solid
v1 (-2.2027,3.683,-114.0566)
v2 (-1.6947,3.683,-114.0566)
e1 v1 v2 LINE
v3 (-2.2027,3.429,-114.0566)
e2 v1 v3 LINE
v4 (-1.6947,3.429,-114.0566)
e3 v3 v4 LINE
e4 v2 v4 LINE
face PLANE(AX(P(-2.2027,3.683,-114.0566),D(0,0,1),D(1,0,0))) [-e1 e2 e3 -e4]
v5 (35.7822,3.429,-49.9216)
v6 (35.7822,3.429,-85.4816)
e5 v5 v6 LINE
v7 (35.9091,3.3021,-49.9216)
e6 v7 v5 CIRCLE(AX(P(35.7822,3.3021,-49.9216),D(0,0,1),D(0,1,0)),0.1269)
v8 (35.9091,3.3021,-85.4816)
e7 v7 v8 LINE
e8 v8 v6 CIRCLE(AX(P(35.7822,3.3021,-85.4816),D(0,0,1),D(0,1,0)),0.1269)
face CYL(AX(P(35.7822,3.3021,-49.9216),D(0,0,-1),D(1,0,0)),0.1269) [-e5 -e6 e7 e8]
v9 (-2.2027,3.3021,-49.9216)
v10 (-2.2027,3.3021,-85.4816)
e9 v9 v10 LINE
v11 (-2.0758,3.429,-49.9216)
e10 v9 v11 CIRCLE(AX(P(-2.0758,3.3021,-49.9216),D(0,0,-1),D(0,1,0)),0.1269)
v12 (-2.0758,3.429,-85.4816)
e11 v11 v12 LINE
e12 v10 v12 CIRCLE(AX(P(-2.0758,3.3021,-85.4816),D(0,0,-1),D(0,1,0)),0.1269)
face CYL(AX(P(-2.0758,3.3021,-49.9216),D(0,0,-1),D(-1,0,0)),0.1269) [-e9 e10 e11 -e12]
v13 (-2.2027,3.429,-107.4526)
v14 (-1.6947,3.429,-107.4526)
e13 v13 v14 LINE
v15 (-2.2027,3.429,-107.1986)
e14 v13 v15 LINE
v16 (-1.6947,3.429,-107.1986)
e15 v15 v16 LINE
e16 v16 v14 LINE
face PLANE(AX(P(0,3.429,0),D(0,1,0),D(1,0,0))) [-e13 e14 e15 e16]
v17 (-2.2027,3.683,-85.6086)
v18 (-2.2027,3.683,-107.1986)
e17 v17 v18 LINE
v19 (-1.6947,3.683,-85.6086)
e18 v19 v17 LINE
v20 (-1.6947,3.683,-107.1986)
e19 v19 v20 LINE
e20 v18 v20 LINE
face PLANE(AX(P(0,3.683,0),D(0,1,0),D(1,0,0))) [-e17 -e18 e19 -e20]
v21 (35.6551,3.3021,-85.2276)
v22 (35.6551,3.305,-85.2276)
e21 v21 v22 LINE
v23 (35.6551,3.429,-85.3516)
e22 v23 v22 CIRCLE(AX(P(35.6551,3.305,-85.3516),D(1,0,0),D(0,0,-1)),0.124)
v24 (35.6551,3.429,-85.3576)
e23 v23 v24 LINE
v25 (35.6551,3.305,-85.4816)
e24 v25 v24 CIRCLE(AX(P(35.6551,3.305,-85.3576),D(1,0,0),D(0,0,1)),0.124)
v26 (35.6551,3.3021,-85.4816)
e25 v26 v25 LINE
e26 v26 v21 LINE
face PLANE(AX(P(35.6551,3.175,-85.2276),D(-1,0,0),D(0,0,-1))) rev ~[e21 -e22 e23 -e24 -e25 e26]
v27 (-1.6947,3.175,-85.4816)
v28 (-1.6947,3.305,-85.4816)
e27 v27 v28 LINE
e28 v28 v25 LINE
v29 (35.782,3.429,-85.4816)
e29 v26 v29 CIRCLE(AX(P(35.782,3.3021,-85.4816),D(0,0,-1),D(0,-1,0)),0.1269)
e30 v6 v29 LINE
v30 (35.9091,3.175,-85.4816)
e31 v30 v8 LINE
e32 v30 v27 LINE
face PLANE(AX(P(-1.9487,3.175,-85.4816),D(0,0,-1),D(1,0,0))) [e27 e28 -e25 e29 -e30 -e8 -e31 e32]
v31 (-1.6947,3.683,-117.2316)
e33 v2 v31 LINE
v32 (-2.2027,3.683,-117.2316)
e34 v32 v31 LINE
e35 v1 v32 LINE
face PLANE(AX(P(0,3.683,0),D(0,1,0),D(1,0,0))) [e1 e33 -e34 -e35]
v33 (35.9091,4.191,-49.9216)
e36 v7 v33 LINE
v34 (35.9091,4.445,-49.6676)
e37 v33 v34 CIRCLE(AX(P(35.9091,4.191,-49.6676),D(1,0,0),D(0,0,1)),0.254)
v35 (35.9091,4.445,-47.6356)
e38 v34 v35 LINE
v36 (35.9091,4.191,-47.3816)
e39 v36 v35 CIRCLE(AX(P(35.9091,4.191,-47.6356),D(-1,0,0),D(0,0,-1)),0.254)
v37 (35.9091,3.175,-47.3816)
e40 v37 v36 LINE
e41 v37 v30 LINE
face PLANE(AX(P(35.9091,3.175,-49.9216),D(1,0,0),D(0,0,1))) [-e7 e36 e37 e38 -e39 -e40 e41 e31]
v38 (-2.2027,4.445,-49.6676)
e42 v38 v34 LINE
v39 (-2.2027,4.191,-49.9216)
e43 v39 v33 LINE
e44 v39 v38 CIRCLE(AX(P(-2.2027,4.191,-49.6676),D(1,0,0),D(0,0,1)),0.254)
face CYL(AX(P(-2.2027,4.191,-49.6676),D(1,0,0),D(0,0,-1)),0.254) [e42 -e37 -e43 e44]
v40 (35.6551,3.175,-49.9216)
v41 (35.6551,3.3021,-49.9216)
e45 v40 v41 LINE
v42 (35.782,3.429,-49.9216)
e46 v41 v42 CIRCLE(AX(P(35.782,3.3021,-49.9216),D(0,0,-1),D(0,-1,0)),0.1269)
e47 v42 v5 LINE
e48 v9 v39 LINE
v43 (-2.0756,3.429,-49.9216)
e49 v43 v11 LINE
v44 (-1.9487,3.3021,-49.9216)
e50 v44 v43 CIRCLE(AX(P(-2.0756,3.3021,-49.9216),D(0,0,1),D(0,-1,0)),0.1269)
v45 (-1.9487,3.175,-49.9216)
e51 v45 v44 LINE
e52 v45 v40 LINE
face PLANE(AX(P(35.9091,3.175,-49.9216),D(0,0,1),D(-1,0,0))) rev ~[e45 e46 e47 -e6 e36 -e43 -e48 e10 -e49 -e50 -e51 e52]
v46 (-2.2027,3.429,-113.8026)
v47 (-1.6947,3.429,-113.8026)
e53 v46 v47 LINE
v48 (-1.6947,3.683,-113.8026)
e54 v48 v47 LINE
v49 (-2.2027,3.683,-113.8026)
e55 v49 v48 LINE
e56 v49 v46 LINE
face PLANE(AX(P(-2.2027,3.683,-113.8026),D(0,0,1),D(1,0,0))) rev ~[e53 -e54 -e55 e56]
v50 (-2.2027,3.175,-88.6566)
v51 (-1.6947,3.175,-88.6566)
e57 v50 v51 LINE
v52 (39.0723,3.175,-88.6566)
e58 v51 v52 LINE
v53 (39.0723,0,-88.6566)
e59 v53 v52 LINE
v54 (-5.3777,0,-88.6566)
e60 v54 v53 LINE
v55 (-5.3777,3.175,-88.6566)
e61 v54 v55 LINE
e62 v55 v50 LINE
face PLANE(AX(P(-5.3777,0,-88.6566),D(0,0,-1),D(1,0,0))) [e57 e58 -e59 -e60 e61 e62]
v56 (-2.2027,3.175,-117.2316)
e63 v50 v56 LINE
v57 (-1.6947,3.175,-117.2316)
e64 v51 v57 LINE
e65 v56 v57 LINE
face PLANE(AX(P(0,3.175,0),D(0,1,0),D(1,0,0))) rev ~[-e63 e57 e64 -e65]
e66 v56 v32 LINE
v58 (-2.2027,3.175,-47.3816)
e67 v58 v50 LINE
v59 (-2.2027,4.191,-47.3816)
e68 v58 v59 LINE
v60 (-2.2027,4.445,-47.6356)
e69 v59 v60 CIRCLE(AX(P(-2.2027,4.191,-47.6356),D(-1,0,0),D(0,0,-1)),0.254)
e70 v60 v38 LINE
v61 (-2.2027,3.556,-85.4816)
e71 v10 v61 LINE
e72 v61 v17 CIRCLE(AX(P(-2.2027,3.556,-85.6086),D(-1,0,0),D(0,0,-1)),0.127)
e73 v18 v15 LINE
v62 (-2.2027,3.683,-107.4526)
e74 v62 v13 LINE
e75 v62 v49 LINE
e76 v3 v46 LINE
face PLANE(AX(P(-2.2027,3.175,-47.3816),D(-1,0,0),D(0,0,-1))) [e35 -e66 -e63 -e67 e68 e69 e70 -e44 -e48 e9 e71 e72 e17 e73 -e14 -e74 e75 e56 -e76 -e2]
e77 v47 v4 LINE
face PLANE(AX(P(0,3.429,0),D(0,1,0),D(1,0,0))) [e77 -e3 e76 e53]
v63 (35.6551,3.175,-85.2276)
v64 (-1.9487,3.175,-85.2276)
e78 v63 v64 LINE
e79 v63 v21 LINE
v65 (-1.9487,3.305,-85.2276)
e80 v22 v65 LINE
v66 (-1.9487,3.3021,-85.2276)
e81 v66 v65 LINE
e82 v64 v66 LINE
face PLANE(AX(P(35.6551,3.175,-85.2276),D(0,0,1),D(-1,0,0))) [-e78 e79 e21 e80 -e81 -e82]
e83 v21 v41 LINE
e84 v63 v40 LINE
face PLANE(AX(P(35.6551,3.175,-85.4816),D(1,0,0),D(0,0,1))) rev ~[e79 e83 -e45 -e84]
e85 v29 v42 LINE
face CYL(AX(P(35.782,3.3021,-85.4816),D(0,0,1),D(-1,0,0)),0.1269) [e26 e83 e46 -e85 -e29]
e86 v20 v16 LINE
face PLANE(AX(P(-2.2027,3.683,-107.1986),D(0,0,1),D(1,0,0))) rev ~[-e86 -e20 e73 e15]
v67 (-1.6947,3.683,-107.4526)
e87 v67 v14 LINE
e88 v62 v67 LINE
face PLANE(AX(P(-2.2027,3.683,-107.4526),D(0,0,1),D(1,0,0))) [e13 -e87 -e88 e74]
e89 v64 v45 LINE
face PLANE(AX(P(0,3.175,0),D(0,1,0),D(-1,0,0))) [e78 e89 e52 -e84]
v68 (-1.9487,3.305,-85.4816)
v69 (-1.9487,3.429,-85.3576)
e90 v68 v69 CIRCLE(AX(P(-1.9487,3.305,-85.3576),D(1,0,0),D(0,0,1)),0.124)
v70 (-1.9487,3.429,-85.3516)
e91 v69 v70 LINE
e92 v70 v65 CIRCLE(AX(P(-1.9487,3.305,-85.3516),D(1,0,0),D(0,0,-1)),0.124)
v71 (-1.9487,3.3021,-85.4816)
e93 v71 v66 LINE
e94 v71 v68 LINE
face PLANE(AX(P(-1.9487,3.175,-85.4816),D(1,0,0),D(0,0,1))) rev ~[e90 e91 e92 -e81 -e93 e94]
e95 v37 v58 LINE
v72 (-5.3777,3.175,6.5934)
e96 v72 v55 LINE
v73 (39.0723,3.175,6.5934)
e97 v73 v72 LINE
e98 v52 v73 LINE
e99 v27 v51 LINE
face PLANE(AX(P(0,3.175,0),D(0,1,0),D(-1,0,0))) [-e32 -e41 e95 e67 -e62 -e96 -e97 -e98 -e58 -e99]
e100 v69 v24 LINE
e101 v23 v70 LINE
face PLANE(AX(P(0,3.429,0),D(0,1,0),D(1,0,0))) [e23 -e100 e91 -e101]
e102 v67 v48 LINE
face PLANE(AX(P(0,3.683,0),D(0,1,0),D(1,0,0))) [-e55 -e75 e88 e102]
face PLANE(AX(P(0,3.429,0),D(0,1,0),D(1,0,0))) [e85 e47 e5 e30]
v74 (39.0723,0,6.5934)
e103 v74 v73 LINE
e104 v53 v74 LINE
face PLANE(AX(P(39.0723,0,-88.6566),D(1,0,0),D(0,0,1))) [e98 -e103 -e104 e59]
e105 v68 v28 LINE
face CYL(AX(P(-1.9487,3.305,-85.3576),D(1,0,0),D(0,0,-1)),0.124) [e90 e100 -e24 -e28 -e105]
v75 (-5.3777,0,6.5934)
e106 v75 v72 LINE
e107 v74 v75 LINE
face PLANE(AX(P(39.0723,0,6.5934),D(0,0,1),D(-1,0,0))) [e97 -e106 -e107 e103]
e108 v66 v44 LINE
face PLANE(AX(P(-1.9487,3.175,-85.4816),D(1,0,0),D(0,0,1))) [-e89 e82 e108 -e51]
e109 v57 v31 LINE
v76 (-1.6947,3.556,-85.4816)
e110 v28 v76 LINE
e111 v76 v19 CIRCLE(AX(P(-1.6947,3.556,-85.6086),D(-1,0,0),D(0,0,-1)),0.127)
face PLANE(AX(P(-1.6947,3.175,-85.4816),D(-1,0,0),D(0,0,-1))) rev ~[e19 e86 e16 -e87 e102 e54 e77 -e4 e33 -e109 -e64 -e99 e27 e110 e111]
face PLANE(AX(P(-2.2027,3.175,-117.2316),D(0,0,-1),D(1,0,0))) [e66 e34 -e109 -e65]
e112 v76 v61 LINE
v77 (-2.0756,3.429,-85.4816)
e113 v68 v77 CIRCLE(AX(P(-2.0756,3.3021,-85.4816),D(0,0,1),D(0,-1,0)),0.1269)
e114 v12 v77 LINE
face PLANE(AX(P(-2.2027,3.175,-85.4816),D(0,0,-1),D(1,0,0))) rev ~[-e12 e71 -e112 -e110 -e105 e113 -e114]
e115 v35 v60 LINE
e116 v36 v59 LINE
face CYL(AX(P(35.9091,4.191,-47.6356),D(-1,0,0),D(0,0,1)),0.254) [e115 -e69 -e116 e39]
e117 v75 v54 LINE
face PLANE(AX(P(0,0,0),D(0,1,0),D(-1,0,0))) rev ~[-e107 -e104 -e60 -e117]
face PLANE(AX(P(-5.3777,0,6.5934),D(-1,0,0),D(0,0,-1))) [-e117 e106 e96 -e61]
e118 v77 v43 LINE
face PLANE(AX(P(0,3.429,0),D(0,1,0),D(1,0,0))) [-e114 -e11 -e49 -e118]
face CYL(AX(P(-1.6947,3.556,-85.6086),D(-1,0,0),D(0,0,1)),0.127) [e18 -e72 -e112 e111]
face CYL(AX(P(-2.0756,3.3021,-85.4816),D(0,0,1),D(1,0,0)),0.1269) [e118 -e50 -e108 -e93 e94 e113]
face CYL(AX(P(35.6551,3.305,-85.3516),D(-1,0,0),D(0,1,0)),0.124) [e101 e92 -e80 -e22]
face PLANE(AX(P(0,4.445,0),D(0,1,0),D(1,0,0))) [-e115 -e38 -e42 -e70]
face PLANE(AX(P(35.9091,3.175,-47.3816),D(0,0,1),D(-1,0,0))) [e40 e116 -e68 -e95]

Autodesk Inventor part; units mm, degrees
ref_plane "YZ Plane" through (0, 0, 0) normal (1, 0, 0) x (0, 1, 0)
ref_plane "XZ Plane" through (0, 0, 0) normal (0, 1, 0) x (-1, 0, 0)
ref_plane "XY Plane" through (0, 0, 0) normal (0, 0, 1) x (1, 0, 0)
sketch "Sketch1" plane through (0, 0, 0) normal (0, 1, 0) x (-1, 0, 0)
  line L0 (5.3777, 6.5934) -> (5.3777, -88.6566)
  line L1 (5.3777, -88.6566) -> (-39.0723, -88.6566)
  line L2 (-39.0723, -88.6566) -> (-39.0723, 6.5934)
  line L3 (-39.0723, 6.5934) -> (5.3777, 6.5934)
  point P0 (0, 0)
  dimension "d0" = 95.25
  dimension "d1" = 44.45
extrude "Extrusion1" add sketch "Sketch1" along normal blind 3.175
sketch "Sketch2" plane through (0, 3.175, 0) normal (0, 1, 0) x (1, 0, 0)
  line L0 (39.0723, 88.6566) -> (-5.3777, 88.6566) projected
  line L1 (-5.3777, 88.6566) -> (-2.2027, 88.6566)
  line L2 (-2.2027, 88.6566) -> (-2.2027, 85.4816)
  line L3 (-2.2027, 85.4816) -> (-1.9487, 85.4816)
  line L4 (-1.9487, 85.4816) -> (-1.9487, 49.9216)
  line L5 (-1.9487, 49.9216) -> (-2.2027, 49.9216)
  line L6 (-2.2027, 49.9216) -> (-2.2027, 85.4816)
  point P0 (0, 0)
  dimension "d4" = 3.175
  dimension "d5" = 3.175
  dimension "d6" = 0.254
  dimension "d7" = 35.56
  dimension "d8" = 35.56
extrude "Extrusion2" add sketch "Sketch2" along normal blind 0.254
fillet "Fillet1" radius 0.127 2 edges at (-1.9487, 3.429, -67.7016) (-2.2027, 3.429, -67.7016)
sketch "Sketch3" plane through (0, 3.175, 0) normal (0, 1, 0) x (1, 0, 0)
  line L0 (39.0723, -6.5934) -> (39.0723, 88.6566) projected
  line L1 (39.0723, 88.6566) -> (35.9091, 88.6566)
  line L2 (39.0723, 88.6566) -> (-5.3777, 88.6566) projected
  line L3 (35.9091, 88.6566) -> (35.9091, 85.4816)
  line L4 (35.9091, 85.4816) -> (35.6551, 85.4816)
  line L5 (35.6551, 85.4816) -> (35.6551, 49.9216)
  line L6 (35.6551, 49.9216) -> (35.9091, 49.9216)
  line L7 (35.9091, 49.9216) -> (35.9091, 85.4816)
  point P0 (0, 0)
  dimension "d12" = 3.175
  dimension "d13" = 0.254
  dimension "d14" = 35.56
  dimension "d15" = 0.254
  dimension "d16" = 35.56
extrude "Extrusion3" add sketch "Sketch3" along normal blind 0.254
fillet "Fillet2" radius 0.127 2 edges at (35.9091, 3.429, -67.7016) (35.6551, 3.429, -67.7016)
sketch "Sketch4" plane through (0, 3.175, 0) normal (0, 1, 0) x (1, 0, 0)
  line L0 (-1.9487, 85.4816) -> (-1.9487, 49.9216) projected
  line L1 (35.6551, 49.9216) -> (35.6551, 85.4816) projected
  line L2 (-1.9487, 85.4816) -> (35.6551, 85.4816)
  line L3 (35.6551, 85.4816) -> (35.6551, 85.2276)
  line L4 (35.6551, 85.2276) -> (-1.9487, 85.2276)
  line L5 (-1.9487, 85.2276) -> (-1.9487, 85.4816)
  point P0 (0, 0)
  dimension "d20" = 0.254
extrude "Extrusion4" add sketch "Sketch4" along normal blind 0.254
fillet "Fillet3" radius 0.127 2 edges at (16.8532, 3.429, -85.2276) (16.8532, 3.429, -85.4816)
sketch "Sketch5" plane through (-2.2027, 3.175, -85.4816) normal (-1, 0, 0) x (0, 0, 1)
  point P0 (85.4816, -3.175)
sketch "Sketch6" plane through (0, 3.175, 0) normal (0, 1, 0) x (1, 0, 0)
  line L0 (-2.2027, 85.4816) -> (-1.9487, 85.4816) projected
  line L1 (-2.2027, 85.4816) -> (-2.4567, 85.4816)
  line L2 (35.6551, 85.4816) -> (-1.9487, 85.4816) projected
  line L3 (-1.9487, 85.4816) -> (-1.6947, 85.4816)
  line L4 (-1.6947, 85.4816) -> (-1.6947, 117.2316)
  line L5 (-2.2027, 85.4816) -> (-2.2027, 117.2316)
  line L6 (-2.2027, 117.2316) -> (-1.6947, 117.2316)
  point P0 (0, 0)
  dimension "d24" = 0.254
  dimension "d25" = 0.254
  dimension "d26" = 31.75
extrude "Extrusion5" add sketch "Sketch6" along normal blind 0.508
fillet "Fillet4" radius 0.127 1 edges at (-1.9487, 3.683, -85.4816)
sketch "Sketch7" plane through (0, 3.683, 0) normal (0, 1, 0) x (1, 0, 0)
  line L0 (-2.2027, 117.2316) -> (-2.2027, 88.6566) projected
  line L1 (-2.2027, 117.2316) -> (-2.2027, 114.0566)
  line L2 (-2.2027, 114.0566) -> (-1.6947, 114.0566)
  line L3 (-1.6947, 85.6086) -> (-1.6947, 117.2316) projected
  line L4 (-2.2027, 114.0566) -> (-2.2027, 113.8026)
  line L5 (-2.2027, 113.8026) -> (-1.6947, 113.8026)
  line L6 (-1.6947, 113.8026) -> (-1.6947, 114.0566)
  point P0 (0, 0)
  dimension "d30" = 3.175
  dimension "d31" = 0.254
extrude "Extrusion6" cut sketch "Sketch7" against normal blind 0.254
sketch "Sketch8" plane through (0, 3.683, 0) normal (0, 1, 0) x (1, 0, 0)
  line L0 (-1.6947, 113.8026) -> (-2.2027, 113.8026) projected
  line L1 (-2.2027, 113.8026) -> (-2.2027, 107.4526)
  line L2 (-2.2027, 117.2316) -> (-2.2027, 88.6566) projected
  line L3 (-2.2027, 107.4526) -> (-1.6947, 107.4526)
  line L4 (-1.6947, 88.6566) -> (-1.6947, 117.2316) projected
  line L5 (-2.2027, 107.4526) -> (-2.2027, 107.1986)
  line L6 (-2.2027, 107.1986) -> (-1.6947, 107.1986)
  line L7 (-1.6947, 107.4526) -> (-1.6947, 107.1986)
  line L8 (-2.2027, 107.4526) -> (-1.6947, 107.4526)
  line L9 (-1.6947, 107.1986) -> (-1.6947, 107.4526)
  line L10 (-2.2027, 107.4526) -> (-2.2027, 107.1986)
  line L11 (-2.2027, 107.1986) -> (-1.6947, 107.1986)
  point P0 (0, 0)
  dimension "d34" = 6.35
  dimension "d35" = 0.254
extrude "Extrusion7" cut sketch "Sketch8" against normal blind 0.254 contours L4 L6 L2 L3
sketch "Sketch9" plane through (0, 3.175, 0) normal (0, 1, 0) x (1, 0, 0)
  line L0 (-2.2027, 85.4816) -> (-2.2027, 49.9216) projected
  line L1 (35.9091, 49.9216) -> (35.6551, 49.9216) projected
  line L2 (-2.2027, 49.9216) -> (35.9091, 49.9216)
  line L3 (35.9091, 49.9216) -> (35.9091, 47.3816)
  line L4 (35.9091, 47.3816) -> (-2.2027, 47.3816)
  line L5 (-2.2027, 47.3816) -> (-2.2027, 49.9216)
  point P0 (0, 0)
  dimension "d38" = 2.54
extrude "Extrusion8" add sketch "Sketch9" along normal blind 1.27
fillet "Fillet5" radius 0.254 2 edges at (16.8532, 4.445, -47.3816) (16.8532, 4.445, -49.9216)
properties part number "mousetrap"
